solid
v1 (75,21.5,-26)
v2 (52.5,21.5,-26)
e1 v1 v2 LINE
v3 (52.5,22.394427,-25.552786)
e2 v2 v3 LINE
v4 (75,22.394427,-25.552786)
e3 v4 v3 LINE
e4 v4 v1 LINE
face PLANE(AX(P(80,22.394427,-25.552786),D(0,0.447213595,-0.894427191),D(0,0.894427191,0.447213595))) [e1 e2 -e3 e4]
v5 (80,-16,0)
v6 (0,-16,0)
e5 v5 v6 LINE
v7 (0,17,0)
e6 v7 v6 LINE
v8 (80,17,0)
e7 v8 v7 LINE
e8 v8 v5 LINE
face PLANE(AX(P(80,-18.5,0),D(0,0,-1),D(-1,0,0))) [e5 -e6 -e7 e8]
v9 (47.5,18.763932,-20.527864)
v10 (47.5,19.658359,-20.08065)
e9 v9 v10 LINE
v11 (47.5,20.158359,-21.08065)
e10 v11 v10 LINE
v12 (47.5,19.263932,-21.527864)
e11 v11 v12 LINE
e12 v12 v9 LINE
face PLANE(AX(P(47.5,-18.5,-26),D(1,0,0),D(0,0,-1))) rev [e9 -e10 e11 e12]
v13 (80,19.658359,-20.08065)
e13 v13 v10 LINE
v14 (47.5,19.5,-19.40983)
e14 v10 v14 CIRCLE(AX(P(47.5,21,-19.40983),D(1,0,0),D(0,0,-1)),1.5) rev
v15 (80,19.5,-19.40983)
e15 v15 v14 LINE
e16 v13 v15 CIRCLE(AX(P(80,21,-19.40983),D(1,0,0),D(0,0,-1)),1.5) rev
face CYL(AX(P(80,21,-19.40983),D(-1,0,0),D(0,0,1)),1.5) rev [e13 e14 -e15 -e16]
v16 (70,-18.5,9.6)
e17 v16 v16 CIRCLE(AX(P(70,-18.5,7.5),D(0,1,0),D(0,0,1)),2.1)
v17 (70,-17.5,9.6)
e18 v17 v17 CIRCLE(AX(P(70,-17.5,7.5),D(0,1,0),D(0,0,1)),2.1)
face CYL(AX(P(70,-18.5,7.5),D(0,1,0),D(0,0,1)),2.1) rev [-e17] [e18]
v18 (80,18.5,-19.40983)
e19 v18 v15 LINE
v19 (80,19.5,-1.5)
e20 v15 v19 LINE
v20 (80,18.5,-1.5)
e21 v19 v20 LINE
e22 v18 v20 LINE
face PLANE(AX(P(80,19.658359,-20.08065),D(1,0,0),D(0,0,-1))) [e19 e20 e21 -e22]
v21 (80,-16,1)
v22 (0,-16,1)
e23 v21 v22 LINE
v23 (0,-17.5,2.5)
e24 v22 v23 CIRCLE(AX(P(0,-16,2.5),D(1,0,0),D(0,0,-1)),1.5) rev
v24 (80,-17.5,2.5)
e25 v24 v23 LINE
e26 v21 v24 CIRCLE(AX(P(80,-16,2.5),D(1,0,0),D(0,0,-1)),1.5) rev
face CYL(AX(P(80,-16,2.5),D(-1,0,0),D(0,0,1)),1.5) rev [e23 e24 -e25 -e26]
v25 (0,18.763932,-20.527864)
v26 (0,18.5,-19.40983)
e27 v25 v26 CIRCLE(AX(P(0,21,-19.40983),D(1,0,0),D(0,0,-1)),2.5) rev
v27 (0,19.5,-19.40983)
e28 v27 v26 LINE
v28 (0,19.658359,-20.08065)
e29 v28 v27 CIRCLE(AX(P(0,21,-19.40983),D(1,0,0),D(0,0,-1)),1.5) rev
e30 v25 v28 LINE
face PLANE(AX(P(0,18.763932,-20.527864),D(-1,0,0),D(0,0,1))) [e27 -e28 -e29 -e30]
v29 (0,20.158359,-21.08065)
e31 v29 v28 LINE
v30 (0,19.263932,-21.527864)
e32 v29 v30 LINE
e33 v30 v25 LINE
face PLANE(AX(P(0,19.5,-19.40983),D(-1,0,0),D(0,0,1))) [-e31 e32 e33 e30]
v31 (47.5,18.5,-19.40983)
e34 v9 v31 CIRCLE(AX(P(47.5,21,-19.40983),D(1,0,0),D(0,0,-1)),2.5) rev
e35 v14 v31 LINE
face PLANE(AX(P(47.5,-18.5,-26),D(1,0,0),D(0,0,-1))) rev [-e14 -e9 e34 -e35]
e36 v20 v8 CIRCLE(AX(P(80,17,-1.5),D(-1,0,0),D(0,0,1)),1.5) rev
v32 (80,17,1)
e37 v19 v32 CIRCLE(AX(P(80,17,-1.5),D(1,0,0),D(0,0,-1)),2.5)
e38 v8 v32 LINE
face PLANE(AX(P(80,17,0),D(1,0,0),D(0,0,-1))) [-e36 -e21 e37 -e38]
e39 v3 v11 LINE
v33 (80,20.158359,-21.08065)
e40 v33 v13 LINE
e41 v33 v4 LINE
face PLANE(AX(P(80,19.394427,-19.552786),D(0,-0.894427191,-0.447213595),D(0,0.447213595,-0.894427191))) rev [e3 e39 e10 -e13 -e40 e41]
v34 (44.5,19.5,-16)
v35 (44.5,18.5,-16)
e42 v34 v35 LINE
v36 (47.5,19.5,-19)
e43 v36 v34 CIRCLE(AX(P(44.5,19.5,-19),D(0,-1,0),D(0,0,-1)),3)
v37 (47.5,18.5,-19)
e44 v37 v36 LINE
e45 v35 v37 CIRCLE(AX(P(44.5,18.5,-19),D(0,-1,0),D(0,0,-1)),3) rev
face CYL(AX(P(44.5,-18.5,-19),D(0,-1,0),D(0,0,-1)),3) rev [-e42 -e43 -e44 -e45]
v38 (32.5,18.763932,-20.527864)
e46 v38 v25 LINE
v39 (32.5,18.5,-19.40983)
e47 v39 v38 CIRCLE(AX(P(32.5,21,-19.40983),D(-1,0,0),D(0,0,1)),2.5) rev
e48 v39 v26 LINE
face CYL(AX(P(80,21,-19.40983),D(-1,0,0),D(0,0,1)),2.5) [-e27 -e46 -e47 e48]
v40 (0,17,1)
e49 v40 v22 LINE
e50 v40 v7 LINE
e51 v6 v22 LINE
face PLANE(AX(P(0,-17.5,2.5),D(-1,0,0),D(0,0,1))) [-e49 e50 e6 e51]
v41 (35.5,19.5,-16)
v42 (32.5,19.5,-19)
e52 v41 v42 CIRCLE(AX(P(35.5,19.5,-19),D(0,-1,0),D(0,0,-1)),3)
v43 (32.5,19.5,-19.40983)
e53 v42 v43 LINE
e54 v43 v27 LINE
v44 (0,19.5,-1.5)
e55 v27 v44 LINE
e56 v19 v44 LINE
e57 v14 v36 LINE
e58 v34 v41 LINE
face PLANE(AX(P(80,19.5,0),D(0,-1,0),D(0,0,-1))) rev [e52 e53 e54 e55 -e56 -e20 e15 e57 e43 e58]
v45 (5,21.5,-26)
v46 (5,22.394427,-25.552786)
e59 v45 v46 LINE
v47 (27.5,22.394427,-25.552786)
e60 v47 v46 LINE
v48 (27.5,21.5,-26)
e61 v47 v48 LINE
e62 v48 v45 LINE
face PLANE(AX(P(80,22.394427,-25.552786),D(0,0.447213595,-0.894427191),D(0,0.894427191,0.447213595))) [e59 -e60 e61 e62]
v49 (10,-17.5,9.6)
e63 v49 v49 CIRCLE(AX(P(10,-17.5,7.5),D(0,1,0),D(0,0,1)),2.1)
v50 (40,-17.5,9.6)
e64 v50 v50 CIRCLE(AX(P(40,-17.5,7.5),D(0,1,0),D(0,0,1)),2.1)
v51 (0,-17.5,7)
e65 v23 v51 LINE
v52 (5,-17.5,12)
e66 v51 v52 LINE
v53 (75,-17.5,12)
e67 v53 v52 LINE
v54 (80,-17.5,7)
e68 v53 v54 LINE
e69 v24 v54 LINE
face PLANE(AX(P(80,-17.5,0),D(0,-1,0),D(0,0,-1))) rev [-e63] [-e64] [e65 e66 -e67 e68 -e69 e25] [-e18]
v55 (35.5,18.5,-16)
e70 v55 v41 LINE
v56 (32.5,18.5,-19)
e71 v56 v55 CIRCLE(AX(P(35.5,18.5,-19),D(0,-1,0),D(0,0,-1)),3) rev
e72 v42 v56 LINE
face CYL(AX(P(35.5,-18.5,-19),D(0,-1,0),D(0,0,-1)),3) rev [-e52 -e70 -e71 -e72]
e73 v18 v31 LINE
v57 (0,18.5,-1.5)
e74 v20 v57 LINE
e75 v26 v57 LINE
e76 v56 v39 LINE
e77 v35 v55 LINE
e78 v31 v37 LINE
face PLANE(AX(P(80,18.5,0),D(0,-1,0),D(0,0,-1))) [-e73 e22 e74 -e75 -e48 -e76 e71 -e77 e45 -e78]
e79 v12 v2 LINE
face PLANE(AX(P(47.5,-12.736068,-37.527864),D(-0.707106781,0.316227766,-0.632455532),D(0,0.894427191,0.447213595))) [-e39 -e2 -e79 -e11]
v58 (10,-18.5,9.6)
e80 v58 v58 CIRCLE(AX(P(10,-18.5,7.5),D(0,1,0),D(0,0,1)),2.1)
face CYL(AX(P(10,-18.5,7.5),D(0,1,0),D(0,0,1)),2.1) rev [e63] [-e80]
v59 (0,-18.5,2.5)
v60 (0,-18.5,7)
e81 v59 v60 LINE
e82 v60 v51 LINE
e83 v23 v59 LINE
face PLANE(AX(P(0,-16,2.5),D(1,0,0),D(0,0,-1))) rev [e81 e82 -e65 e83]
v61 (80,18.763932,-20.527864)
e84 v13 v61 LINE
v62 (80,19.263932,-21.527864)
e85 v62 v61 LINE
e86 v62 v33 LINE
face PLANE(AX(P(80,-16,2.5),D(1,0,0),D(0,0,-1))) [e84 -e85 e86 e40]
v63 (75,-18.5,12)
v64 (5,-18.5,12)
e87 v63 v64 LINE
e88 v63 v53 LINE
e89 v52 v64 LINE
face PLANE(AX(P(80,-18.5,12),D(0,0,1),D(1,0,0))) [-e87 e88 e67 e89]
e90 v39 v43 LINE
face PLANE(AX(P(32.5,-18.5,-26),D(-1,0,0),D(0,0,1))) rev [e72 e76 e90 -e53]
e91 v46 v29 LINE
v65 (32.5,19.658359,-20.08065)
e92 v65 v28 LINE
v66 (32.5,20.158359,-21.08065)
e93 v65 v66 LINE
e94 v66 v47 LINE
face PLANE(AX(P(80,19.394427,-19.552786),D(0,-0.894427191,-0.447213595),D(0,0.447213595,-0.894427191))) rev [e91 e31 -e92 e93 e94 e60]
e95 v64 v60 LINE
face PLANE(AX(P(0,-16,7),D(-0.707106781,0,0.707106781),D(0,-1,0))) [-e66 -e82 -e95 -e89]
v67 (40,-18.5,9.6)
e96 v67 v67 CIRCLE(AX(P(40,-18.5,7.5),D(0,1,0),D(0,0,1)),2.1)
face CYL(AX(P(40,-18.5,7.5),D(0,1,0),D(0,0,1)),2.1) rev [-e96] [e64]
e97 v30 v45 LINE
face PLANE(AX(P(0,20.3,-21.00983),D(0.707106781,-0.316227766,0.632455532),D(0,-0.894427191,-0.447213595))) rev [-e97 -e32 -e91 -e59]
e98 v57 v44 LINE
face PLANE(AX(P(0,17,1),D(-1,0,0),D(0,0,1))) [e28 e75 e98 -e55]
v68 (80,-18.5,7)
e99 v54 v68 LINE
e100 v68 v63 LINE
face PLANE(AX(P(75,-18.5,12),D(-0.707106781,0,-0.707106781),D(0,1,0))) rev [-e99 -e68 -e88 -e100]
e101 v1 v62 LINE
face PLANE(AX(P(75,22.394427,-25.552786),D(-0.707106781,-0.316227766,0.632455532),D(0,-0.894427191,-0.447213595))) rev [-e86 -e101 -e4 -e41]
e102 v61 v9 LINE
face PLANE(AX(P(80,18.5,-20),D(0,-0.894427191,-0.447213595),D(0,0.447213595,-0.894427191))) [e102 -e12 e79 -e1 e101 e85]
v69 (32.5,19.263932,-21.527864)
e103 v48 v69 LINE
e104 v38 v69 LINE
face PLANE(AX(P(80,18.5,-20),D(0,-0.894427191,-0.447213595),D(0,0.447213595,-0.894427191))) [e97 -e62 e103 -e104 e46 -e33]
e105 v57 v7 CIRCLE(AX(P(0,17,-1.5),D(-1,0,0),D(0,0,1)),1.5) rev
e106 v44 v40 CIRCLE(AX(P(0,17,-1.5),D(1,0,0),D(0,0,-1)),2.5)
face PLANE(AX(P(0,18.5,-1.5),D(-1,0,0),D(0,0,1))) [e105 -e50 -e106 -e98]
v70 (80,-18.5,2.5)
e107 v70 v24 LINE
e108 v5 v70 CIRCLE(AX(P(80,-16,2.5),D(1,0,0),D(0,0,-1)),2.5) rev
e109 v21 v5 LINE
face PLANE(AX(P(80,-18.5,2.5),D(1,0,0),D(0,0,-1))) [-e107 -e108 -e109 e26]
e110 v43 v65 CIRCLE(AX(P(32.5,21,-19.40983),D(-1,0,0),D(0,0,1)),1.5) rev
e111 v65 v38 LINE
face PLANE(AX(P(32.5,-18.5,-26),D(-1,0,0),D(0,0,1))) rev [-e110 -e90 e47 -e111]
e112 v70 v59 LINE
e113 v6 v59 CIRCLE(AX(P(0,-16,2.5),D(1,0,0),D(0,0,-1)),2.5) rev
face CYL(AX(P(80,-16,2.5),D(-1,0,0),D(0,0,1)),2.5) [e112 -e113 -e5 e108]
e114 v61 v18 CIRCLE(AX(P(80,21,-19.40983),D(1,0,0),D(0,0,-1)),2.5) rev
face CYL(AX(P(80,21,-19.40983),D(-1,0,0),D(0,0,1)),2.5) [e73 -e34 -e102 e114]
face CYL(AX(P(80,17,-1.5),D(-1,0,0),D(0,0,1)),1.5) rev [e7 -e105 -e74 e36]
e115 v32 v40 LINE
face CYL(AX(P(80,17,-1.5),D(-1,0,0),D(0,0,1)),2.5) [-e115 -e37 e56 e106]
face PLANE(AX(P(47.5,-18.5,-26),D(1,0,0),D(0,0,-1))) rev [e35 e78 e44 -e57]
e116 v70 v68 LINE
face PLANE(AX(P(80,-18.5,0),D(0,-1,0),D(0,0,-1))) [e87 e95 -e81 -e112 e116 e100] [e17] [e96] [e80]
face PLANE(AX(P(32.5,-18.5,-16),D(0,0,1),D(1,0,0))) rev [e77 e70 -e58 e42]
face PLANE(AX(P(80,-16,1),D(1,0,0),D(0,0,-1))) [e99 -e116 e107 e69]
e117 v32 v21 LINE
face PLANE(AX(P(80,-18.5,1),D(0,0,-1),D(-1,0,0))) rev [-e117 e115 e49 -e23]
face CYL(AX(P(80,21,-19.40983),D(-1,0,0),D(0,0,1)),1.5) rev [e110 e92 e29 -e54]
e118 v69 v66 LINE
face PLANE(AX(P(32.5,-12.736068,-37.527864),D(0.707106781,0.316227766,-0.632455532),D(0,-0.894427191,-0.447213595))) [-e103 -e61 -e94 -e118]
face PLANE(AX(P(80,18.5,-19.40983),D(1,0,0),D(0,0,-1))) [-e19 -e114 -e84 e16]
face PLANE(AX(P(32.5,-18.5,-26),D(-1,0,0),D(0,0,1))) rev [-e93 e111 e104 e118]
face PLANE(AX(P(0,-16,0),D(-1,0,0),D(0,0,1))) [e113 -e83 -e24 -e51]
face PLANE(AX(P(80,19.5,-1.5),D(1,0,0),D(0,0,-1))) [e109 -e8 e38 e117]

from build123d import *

# Parameters (mm, degrees)
BASE_FLANGE1_DEPTH       = 80
SKETCH7_R                = 2.1
CUT_EXTRUDE2_DEPTH       = 94.099760047
LPATTERN1_COUNT          = 2
LPATTERN1_PITCH          = 30
LPATTERN1_COL_COUNT      = 2
LPATTERN1_COL_PITCH      = 30
CUT_EXTRUDE_1_DEPTH      = 93.303846074
CUT_EXTRUDE_1_DEPTH_BACK = 93.303846074
SKETCH_1_W               = 15
SKETCH_1_H               = 10
CHAMFER_1_SIZE           = 5
FILLET_1_R               = 3


# Read off the part's stored shape, not the designer's step: Base-Flange1
with BuildPart() as part:
    # Base-Flange1 outline → Base-Flange1 (new body)
    with BuildSketch(Plane(origin=(0, 0, 0), x_dir=(0, 0, -1), z_dir=(1, 0, 0))):
        with BuildLine():
            Line((-2.5, -17.5), (-12, -17.5))
            Line((-12, -17.5), (-12, -18.5))
            Line((-12, -18.5), (-2.5, -18.5))
            ThreePointArc((-2.5, -18.5), (-0.732233047, -17.767766953), (0, -16))
            Line((0, -16), (0, 17))
            ThreePointArc((0, 17), (0.439339828, 18.060660172), (1.5, 18.5))
            Line((1.5, 18.5), (19.409830056, 18.5))
            ThreePointArc((19.409830056, 18.5), (19.984212358, 18.566877526), (20.527864045, 18.763932023))
            Line((20.527864045, 18.763932023), (26, 21.5))
            Line((26, 21.5), (25.552786405, 22.394427191))
            Line((25.552786405, 22.394427191), (20.08065045, 19.658359214))
            ThreePointArc((20.08065045, 19.658359214), (19.754459437, 19.540126516), (19.409830056, 19.5))
            Line((19.409830056, 19.5), (1.5, 19.5))
            ThreePointArc((1.5, 19.5), (-0.267766953, 18.767766953), (-1, 17))
            Line((-1, 17), (-1, -16))
            ThreePointArc((-1, -16), (-1.439339828, -17.060660172), (-2.5, -17.5))
        make_face()
    extrude(amount=BASE_FLANGE1_DEPTH)

    # Sketch7 → Cut-Extrude2 (cut, through all)
    with BuildSketch(Plane(origin=(0, -17.5, 0), x_dir=(1, 0, 0), z_dir=(0, 1, 0))):
        with Locations(Location((40, -7.5, 0), (0, 0, 270))):
            Circle(SKETCH7_R)
    cut_extrude2 = extrude(amount=-CUT_EXTRUDE2_DEPTH, mode=Mode.SUBTRACT)

    # LPattern1: Cut-Extrude2 ×2
    with Locations(*[(i * LPATTERN1_PITCH, 0, 0) for i in range(1, LPATTERN1_COUNT)]):
        add(cut_extrude2, mode=Mode.SUBTRACT)

    # LPattern1 col: Cut-Extrude2 ×2
    with Locations(*[(-i * LPATTERN1_COL_PITCH, 0, 0) for i in range(1, LPATTERN1_COL_COUNT)]):
        add(cut_extrude2, mode=Mode.SUBTRACT)

    # Sketch 1 → 除料-伸長1 (cut, two sides: drawn at the far end of the back side and taken through both)
    with BuildSketch(Plane(origin=(0, 19.5, 0), x_dir=(1, 0, 0), z_dir=(0, 1, 0)).offset(-CUT_EXTRUDE_1_DEPTH_BACK)):
        with Locations((40, 21)):
            Rectangle(SKETCH_1_W, SKETCH_1_H)
    extrude(amount=CUT_EXTRUDE_1_DEPTH + CUT_EXTRUDE_1_DEPTH_BACK, mode=Mode.SUBTRACT)

    # 導角1
    chamfer_1_edges = [part.edges().sort_by_distance(p)[0] for p in [
        (32.5, 21.947213595, -25.776393202),
        (47.5, 21.947213595, -25.776393202),
        (0, 21.947213595, -25.776393202),
        (0, -18, 12),
        (80, 21.947213595, -25.776393202),
        (80, -18, 12),
    ]]
    chamfer(chamfer_1_edges, length=CHAMFER_1_SIZE)

    # 圓角1
    fillet_1_edges = [part.edges().sort_by_distance(p)[0] for p in [
        (32.5, 19, -16),
        (47.5, 19, -16),
    ]]
    fillet(fillet_1_edges, radius=FILLET_1_R)


solid = part.part
